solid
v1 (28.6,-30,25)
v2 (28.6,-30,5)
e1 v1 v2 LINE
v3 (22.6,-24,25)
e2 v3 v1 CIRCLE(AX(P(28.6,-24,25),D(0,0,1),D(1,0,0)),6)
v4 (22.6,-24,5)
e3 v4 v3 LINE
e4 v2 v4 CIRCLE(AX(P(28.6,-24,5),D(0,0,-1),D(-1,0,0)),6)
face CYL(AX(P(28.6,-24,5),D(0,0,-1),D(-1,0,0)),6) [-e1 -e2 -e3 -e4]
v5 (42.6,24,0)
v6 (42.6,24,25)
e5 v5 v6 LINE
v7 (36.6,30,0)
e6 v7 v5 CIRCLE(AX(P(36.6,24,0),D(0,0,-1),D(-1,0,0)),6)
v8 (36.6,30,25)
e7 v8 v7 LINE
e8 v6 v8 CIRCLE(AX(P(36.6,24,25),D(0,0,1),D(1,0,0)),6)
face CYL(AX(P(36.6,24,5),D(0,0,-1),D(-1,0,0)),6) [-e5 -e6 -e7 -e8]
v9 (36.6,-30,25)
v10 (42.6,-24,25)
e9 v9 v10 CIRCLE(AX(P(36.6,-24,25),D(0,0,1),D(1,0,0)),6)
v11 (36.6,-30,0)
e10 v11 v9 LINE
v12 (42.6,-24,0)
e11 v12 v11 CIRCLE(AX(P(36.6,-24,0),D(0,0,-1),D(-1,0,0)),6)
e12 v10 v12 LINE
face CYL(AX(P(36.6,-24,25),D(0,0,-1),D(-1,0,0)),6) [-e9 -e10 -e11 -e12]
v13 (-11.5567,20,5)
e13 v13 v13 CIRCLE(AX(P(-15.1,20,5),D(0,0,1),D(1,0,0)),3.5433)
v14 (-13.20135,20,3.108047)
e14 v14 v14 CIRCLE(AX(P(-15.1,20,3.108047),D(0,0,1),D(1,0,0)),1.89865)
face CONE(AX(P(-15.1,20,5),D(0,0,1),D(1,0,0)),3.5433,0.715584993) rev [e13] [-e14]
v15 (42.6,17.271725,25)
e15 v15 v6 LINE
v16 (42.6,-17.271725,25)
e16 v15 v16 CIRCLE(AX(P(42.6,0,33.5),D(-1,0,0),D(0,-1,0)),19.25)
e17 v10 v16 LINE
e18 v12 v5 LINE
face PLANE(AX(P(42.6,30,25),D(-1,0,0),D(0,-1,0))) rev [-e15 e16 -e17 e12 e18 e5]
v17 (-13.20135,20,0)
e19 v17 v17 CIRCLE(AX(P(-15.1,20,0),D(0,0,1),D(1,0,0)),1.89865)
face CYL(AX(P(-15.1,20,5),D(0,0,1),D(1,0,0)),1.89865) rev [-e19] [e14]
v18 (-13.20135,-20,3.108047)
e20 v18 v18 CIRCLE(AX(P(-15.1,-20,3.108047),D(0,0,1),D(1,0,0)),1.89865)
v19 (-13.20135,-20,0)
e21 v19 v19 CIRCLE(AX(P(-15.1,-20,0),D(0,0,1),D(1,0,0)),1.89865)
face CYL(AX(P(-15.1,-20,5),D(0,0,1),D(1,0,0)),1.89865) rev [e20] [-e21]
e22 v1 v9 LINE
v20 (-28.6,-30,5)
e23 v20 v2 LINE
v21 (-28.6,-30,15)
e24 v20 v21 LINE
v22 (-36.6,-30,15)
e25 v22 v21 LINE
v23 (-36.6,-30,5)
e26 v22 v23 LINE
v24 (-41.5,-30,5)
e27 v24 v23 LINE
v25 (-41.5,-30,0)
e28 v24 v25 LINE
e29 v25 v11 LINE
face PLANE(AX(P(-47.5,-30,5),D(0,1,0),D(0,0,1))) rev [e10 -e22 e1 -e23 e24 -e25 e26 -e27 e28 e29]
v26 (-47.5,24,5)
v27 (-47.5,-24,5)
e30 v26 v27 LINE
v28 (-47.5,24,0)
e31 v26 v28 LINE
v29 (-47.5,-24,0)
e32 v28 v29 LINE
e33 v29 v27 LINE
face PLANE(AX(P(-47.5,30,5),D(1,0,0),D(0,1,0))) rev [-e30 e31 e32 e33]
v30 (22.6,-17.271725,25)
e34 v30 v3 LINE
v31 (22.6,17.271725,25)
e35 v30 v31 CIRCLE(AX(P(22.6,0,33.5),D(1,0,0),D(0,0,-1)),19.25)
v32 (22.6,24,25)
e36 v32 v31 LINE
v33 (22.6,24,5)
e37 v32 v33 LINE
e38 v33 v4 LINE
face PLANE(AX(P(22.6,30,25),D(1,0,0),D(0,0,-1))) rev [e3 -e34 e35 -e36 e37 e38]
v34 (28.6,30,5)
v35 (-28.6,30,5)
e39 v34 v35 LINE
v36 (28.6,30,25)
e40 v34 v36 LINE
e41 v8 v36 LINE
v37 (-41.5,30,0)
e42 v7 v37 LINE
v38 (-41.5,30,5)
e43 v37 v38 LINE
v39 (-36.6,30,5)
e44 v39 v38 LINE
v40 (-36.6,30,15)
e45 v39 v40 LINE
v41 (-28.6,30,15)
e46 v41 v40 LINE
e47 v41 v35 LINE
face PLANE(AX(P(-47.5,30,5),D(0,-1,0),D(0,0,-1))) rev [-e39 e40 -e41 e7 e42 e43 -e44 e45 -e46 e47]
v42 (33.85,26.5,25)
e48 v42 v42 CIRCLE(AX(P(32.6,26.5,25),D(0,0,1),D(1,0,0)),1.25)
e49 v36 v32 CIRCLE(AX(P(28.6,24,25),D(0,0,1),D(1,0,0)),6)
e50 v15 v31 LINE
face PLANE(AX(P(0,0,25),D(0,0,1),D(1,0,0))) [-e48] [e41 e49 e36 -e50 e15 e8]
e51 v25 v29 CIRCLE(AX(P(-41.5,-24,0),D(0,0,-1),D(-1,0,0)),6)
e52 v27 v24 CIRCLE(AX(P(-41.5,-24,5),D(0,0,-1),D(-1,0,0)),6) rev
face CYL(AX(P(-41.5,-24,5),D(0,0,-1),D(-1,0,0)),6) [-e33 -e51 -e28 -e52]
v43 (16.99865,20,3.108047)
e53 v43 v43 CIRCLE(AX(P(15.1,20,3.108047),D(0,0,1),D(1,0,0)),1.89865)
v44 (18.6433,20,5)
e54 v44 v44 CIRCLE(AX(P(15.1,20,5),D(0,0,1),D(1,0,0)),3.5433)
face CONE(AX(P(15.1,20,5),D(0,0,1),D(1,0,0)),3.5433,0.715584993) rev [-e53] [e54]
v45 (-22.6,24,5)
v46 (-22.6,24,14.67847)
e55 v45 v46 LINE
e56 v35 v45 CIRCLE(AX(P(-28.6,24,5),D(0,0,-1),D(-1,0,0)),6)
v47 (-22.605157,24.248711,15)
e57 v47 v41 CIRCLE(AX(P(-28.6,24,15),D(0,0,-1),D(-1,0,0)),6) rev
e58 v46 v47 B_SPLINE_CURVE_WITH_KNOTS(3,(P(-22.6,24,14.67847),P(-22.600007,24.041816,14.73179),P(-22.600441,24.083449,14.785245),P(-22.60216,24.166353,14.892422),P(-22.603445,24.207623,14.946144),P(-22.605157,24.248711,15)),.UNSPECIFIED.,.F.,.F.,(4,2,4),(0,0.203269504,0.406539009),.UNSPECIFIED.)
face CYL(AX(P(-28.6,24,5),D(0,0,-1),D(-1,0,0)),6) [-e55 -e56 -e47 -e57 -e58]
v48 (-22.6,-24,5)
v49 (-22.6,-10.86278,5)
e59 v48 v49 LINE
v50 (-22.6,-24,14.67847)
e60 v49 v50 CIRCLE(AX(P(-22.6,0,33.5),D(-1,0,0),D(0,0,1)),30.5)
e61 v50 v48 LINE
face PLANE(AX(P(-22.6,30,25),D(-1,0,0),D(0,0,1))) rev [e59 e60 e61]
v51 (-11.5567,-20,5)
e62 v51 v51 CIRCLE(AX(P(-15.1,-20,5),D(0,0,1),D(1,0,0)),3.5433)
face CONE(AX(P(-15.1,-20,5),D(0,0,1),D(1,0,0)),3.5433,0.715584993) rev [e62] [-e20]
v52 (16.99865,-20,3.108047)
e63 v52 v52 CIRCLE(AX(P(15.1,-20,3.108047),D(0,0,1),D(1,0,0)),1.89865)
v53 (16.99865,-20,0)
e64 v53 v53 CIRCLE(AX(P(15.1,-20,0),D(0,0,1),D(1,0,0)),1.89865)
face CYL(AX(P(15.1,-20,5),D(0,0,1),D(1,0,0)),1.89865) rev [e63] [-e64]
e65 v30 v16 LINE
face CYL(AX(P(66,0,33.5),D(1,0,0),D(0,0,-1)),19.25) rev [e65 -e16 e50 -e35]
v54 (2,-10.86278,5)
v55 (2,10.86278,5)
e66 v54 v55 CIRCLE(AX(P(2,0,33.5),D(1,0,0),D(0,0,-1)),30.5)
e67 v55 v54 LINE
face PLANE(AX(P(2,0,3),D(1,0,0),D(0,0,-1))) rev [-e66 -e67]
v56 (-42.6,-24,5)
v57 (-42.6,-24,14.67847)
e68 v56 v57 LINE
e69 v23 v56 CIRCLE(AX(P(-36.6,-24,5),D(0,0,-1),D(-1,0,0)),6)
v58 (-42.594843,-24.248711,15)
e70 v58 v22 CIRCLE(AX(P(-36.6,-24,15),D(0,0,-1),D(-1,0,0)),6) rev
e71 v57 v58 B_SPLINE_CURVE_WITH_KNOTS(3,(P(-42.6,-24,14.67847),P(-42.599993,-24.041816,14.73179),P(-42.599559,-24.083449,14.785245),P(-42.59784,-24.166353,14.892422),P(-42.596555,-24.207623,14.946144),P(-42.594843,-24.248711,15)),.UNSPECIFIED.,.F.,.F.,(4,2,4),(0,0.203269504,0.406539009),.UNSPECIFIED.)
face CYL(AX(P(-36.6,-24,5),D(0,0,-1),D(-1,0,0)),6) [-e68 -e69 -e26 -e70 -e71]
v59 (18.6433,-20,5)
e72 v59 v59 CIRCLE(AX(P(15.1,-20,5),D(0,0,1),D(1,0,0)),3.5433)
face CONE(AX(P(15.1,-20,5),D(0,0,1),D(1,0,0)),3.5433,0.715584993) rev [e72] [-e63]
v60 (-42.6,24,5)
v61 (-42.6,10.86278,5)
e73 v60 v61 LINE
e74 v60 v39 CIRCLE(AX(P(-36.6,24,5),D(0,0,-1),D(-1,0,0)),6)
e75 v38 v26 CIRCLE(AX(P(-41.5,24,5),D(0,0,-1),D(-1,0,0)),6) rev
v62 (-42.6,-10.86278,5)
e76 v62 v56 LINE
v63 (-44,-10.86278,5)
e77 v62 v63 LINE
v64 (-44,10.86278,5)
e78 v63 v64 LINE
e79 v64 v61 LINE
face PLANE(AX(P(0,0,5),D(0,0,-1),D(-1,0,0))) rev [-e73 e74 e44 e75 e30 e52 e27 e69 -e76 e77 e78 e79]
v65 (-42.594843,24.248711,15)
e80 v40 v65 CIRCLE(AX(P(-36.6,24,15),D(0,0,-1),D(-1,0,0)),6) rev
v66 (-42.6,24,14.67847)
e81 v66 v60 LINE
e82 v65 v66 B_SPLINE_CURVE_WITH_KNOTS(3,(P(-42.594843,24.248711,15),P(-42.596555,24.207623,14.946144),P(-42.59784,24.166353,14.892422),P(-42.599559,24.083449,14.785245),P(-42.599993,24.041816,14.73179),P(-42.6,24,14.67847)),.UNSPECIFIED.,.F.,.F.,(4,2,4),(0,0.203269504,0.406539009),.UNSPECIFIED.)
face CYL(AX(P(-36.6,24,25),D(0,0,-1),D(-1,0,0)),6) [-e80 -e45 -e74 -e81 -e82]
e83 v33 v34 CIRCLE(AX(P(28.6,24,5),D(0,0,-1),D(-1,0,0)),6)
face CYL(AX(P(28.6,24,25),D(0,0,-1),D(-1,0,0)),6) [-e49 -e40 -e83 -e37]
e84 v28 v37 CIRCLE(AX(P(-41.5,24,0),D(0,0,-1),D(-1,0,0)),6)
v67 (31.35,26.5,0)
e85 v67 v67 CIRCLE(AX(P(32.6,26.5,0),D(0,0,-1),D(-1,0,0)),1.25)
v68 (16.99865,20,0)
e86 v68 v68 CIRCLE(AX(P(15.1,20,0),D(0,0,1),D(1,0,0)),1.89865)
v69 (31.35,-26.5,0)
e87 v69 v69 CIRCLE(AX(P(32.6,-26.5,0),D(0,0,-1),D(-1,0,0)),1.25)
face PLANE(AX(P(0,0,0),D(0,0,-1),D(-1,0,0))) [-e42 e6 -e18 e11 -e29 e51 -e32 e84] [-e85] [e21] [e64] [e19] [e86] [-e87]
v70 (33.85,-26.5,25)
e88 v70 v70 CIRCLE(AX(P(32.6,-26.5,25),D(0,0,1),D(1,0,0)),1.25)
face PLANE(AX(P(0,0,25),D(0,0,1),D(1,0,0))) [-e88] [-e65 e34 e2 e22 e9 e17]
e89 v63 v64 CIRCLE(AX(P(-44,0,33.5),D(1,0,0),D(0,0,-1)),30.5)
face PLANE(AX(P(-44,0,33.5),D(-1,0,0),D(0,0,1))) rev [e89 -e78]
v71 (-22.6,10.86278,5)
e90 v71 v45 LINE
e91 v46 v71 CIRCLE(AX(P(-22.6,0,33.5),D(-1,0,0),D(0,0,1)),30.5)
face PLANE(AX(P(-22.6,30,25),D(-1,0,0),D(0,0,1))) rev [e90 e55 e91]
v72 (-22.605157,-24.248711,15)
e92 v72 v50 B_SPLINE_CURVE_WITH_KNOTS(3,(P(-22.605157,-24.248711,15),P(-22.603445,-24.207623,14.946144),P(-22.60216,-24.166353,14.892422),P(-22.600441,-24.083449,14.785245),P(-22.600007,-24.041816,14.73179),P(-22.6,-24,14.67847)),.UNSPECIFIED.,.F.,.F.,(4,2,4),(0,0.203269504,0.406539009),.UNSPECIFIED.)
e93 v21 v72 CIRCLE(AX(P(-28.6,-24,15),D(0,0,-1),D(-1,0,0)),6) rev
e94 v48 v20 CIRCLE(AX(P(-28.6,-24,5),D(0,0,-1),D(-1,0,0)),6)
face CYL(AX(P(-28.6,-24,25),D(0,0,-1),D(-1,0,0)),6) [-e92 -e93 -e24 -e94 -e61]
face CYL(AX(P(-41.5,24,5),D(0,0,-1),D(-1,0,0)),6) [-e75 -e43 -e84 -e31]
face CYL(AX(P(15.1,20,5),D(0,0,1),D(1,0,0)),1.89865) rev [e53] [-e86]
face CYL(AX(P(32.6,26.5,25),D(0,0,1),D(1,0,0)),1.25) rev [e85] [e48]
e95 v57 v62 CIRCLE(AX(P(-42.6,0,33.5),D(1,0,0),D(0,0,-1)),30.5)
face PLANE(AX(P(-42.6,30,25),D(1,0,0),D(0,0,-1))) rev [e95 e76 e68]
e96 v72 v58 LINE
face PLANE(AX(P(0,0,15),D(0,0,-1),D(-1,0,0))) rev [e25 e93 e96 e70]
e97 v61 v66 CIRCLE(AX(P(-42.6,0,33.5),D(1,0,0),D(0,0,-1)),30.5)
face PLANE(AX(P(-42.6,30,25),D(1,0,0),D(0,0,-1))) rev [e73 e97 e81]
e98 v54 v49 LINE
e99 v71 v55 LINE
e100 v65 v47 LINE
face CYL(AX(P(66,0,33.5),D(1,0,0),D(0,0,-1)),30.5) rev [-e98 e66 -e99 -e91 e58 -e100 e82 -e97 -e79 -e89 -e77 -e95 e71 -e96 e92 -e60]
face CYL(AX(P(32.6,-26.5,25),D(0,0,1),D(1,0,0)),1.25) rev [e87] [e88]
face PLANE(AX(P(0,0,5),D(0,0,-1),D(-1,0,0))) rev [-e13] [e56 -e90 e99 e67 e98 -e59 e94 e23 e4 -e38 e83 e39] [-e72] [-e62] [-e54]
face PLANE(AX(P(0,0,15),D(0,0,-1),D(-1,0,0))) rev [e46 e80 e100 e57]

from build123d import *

# Parameters (mm, degrees)
BASE_SKETCH_W                   = 90
BASE_SKETCH_H                   = 60
BASE_EXTRUDE_DEPTH              = 5
CRADLE_SKETCH_W                 = 20
CRADLE_SKETCH_H                 = 60
CRADLE_EXTRUDE_DEPTH            = 25
NO_6_MOUNTING_HOLES_D           = 3.7973
NO_6_MOUNTING_HOLES_CSINK_D     = 7.0866
NO_6_MOUNTING_HOLES_CSINK_ANGLE = 82
MOVE_START                      = 15
MOVE_FACE_OUTLINE_W             = 20
MOVE_FACE_OUTLINE_H             = 60
MOVE_FACE_DEPTH                 = 10
CLAMP_THREADED_HOLE_D           = 2.5
CRADLE_FILLETS_R                = 6
BASE_FILLETS_R                  = 6


# Read off the part's stored shape, not the designer's step: Move Face
with BuildPart() as part:
    # Base Sketch → Base Extrude (new body)
    with BuildSketch(Plane.XY):
        with Locations((-2.5, 0)):
            Rectangle(BASE_SKETCH_W, BASE_SKETCH_H)
    extrude(amount=BASE_EXTRUDE_DEPTH)

    # Cradle Sketch → Cradle Extrude (add)
    with BuildSketch(Plane.XY):
        with Locations((-32.6, 0)):
            Rectangle(CRADLE_SKETCH_W, CRADLE_SKETCH_H)
        with Locations((32.6, 0)):
            Rectangle(CRADLE_SKETCH_W, CRADLE_SKETCH_H)
    extrude(amount=CRADLE_EXTRUDE_DEPTH)

    # No. 6 Mounting Holes (through all)
    with Locations(Plane.XY.offset(5)):
        with Locations((-15.1, 20), (15.1, 20), (-15.1, -20), (15.1, -20)):
            CounterSinkHole(NO_6_MOUNTING_HOLES_D / 2, NO_6_MOUNTING_HOLES_CSINK_D / 2, counter_sink_angle=NO_6_MOUNTING_HOLES_CSINK_ANGLE)

    # Pump and Motor Revolve Cut Sketch → Pump and Motor Revolve Cut (revolve, cut)
    with BuildSketch(Plane(origin=(0, 0, 0), x_dir=(1, 0, 0), z_dir=(0, 1, 0))):
        Polygon((-44, -33.5), (-44, -3), (2, -3), (2, -14.25), (66, -14.25), (66, -33.5), align=None)
    revolve(axis=Axis((66, 0, 33.5), (-1, 0, 0)), mode=Mode.SUBTRACT)

    # Move Face outline → Move Face (cut)
    with BuildSketch(Plane.XY.offset(MOVE_START)):
        with Locations((-32.6, 0)):
            Rectangle(MOVE_FACE_OUTLINE_W, MOVE_FACE_OUTLINE_H)
    extrude(amount=MOVE_FACE_DEPTH, mode=Mode.SUBTRACT)

    # Clamp Threaded Hole (through all)
    with Locations(Plane.XY.offset(25)):
        with Locations((32.6, -26.5)):
            clamp_threaded_hole = Hole(CLAMP_THREADED_HOLE_D / 2)

    # Threaded Hole Mirror: Clamp Threaded Hole across plane
    add(clamp_threaded_hole.mirror(Plane.ZX), mode=Mode.SUBTRACT)

    # Cradle Fillets
    cradle_fillets_edges = [part.edges().sort_by_distance(p)[0] for p in [
        (-42.6, 30, 10),
        (42.6, 30, 12.5),
        (42.6, -30, 12.5),
        (-42.6, -30, 10),
        (22.6, 30, 15),
        (22.6, -30, 15),
        (-22.6, 30, 10),
        (-22.6, -30, 10),
    ]]
    fillet(cradle_fillets_edges, radius=CRADLE_FILLETS_R)

    # Base Fillets
    base_fillets_edges = [part.edges().sort_by_distance(p)[0] for p in [
        (-47.5, -30, 2.5),
        (-47.5, 30, 2.5),
    ]]
    fillet(base_fillets_edges, radius=BASE_FILLETS_R)


solid = part.part
